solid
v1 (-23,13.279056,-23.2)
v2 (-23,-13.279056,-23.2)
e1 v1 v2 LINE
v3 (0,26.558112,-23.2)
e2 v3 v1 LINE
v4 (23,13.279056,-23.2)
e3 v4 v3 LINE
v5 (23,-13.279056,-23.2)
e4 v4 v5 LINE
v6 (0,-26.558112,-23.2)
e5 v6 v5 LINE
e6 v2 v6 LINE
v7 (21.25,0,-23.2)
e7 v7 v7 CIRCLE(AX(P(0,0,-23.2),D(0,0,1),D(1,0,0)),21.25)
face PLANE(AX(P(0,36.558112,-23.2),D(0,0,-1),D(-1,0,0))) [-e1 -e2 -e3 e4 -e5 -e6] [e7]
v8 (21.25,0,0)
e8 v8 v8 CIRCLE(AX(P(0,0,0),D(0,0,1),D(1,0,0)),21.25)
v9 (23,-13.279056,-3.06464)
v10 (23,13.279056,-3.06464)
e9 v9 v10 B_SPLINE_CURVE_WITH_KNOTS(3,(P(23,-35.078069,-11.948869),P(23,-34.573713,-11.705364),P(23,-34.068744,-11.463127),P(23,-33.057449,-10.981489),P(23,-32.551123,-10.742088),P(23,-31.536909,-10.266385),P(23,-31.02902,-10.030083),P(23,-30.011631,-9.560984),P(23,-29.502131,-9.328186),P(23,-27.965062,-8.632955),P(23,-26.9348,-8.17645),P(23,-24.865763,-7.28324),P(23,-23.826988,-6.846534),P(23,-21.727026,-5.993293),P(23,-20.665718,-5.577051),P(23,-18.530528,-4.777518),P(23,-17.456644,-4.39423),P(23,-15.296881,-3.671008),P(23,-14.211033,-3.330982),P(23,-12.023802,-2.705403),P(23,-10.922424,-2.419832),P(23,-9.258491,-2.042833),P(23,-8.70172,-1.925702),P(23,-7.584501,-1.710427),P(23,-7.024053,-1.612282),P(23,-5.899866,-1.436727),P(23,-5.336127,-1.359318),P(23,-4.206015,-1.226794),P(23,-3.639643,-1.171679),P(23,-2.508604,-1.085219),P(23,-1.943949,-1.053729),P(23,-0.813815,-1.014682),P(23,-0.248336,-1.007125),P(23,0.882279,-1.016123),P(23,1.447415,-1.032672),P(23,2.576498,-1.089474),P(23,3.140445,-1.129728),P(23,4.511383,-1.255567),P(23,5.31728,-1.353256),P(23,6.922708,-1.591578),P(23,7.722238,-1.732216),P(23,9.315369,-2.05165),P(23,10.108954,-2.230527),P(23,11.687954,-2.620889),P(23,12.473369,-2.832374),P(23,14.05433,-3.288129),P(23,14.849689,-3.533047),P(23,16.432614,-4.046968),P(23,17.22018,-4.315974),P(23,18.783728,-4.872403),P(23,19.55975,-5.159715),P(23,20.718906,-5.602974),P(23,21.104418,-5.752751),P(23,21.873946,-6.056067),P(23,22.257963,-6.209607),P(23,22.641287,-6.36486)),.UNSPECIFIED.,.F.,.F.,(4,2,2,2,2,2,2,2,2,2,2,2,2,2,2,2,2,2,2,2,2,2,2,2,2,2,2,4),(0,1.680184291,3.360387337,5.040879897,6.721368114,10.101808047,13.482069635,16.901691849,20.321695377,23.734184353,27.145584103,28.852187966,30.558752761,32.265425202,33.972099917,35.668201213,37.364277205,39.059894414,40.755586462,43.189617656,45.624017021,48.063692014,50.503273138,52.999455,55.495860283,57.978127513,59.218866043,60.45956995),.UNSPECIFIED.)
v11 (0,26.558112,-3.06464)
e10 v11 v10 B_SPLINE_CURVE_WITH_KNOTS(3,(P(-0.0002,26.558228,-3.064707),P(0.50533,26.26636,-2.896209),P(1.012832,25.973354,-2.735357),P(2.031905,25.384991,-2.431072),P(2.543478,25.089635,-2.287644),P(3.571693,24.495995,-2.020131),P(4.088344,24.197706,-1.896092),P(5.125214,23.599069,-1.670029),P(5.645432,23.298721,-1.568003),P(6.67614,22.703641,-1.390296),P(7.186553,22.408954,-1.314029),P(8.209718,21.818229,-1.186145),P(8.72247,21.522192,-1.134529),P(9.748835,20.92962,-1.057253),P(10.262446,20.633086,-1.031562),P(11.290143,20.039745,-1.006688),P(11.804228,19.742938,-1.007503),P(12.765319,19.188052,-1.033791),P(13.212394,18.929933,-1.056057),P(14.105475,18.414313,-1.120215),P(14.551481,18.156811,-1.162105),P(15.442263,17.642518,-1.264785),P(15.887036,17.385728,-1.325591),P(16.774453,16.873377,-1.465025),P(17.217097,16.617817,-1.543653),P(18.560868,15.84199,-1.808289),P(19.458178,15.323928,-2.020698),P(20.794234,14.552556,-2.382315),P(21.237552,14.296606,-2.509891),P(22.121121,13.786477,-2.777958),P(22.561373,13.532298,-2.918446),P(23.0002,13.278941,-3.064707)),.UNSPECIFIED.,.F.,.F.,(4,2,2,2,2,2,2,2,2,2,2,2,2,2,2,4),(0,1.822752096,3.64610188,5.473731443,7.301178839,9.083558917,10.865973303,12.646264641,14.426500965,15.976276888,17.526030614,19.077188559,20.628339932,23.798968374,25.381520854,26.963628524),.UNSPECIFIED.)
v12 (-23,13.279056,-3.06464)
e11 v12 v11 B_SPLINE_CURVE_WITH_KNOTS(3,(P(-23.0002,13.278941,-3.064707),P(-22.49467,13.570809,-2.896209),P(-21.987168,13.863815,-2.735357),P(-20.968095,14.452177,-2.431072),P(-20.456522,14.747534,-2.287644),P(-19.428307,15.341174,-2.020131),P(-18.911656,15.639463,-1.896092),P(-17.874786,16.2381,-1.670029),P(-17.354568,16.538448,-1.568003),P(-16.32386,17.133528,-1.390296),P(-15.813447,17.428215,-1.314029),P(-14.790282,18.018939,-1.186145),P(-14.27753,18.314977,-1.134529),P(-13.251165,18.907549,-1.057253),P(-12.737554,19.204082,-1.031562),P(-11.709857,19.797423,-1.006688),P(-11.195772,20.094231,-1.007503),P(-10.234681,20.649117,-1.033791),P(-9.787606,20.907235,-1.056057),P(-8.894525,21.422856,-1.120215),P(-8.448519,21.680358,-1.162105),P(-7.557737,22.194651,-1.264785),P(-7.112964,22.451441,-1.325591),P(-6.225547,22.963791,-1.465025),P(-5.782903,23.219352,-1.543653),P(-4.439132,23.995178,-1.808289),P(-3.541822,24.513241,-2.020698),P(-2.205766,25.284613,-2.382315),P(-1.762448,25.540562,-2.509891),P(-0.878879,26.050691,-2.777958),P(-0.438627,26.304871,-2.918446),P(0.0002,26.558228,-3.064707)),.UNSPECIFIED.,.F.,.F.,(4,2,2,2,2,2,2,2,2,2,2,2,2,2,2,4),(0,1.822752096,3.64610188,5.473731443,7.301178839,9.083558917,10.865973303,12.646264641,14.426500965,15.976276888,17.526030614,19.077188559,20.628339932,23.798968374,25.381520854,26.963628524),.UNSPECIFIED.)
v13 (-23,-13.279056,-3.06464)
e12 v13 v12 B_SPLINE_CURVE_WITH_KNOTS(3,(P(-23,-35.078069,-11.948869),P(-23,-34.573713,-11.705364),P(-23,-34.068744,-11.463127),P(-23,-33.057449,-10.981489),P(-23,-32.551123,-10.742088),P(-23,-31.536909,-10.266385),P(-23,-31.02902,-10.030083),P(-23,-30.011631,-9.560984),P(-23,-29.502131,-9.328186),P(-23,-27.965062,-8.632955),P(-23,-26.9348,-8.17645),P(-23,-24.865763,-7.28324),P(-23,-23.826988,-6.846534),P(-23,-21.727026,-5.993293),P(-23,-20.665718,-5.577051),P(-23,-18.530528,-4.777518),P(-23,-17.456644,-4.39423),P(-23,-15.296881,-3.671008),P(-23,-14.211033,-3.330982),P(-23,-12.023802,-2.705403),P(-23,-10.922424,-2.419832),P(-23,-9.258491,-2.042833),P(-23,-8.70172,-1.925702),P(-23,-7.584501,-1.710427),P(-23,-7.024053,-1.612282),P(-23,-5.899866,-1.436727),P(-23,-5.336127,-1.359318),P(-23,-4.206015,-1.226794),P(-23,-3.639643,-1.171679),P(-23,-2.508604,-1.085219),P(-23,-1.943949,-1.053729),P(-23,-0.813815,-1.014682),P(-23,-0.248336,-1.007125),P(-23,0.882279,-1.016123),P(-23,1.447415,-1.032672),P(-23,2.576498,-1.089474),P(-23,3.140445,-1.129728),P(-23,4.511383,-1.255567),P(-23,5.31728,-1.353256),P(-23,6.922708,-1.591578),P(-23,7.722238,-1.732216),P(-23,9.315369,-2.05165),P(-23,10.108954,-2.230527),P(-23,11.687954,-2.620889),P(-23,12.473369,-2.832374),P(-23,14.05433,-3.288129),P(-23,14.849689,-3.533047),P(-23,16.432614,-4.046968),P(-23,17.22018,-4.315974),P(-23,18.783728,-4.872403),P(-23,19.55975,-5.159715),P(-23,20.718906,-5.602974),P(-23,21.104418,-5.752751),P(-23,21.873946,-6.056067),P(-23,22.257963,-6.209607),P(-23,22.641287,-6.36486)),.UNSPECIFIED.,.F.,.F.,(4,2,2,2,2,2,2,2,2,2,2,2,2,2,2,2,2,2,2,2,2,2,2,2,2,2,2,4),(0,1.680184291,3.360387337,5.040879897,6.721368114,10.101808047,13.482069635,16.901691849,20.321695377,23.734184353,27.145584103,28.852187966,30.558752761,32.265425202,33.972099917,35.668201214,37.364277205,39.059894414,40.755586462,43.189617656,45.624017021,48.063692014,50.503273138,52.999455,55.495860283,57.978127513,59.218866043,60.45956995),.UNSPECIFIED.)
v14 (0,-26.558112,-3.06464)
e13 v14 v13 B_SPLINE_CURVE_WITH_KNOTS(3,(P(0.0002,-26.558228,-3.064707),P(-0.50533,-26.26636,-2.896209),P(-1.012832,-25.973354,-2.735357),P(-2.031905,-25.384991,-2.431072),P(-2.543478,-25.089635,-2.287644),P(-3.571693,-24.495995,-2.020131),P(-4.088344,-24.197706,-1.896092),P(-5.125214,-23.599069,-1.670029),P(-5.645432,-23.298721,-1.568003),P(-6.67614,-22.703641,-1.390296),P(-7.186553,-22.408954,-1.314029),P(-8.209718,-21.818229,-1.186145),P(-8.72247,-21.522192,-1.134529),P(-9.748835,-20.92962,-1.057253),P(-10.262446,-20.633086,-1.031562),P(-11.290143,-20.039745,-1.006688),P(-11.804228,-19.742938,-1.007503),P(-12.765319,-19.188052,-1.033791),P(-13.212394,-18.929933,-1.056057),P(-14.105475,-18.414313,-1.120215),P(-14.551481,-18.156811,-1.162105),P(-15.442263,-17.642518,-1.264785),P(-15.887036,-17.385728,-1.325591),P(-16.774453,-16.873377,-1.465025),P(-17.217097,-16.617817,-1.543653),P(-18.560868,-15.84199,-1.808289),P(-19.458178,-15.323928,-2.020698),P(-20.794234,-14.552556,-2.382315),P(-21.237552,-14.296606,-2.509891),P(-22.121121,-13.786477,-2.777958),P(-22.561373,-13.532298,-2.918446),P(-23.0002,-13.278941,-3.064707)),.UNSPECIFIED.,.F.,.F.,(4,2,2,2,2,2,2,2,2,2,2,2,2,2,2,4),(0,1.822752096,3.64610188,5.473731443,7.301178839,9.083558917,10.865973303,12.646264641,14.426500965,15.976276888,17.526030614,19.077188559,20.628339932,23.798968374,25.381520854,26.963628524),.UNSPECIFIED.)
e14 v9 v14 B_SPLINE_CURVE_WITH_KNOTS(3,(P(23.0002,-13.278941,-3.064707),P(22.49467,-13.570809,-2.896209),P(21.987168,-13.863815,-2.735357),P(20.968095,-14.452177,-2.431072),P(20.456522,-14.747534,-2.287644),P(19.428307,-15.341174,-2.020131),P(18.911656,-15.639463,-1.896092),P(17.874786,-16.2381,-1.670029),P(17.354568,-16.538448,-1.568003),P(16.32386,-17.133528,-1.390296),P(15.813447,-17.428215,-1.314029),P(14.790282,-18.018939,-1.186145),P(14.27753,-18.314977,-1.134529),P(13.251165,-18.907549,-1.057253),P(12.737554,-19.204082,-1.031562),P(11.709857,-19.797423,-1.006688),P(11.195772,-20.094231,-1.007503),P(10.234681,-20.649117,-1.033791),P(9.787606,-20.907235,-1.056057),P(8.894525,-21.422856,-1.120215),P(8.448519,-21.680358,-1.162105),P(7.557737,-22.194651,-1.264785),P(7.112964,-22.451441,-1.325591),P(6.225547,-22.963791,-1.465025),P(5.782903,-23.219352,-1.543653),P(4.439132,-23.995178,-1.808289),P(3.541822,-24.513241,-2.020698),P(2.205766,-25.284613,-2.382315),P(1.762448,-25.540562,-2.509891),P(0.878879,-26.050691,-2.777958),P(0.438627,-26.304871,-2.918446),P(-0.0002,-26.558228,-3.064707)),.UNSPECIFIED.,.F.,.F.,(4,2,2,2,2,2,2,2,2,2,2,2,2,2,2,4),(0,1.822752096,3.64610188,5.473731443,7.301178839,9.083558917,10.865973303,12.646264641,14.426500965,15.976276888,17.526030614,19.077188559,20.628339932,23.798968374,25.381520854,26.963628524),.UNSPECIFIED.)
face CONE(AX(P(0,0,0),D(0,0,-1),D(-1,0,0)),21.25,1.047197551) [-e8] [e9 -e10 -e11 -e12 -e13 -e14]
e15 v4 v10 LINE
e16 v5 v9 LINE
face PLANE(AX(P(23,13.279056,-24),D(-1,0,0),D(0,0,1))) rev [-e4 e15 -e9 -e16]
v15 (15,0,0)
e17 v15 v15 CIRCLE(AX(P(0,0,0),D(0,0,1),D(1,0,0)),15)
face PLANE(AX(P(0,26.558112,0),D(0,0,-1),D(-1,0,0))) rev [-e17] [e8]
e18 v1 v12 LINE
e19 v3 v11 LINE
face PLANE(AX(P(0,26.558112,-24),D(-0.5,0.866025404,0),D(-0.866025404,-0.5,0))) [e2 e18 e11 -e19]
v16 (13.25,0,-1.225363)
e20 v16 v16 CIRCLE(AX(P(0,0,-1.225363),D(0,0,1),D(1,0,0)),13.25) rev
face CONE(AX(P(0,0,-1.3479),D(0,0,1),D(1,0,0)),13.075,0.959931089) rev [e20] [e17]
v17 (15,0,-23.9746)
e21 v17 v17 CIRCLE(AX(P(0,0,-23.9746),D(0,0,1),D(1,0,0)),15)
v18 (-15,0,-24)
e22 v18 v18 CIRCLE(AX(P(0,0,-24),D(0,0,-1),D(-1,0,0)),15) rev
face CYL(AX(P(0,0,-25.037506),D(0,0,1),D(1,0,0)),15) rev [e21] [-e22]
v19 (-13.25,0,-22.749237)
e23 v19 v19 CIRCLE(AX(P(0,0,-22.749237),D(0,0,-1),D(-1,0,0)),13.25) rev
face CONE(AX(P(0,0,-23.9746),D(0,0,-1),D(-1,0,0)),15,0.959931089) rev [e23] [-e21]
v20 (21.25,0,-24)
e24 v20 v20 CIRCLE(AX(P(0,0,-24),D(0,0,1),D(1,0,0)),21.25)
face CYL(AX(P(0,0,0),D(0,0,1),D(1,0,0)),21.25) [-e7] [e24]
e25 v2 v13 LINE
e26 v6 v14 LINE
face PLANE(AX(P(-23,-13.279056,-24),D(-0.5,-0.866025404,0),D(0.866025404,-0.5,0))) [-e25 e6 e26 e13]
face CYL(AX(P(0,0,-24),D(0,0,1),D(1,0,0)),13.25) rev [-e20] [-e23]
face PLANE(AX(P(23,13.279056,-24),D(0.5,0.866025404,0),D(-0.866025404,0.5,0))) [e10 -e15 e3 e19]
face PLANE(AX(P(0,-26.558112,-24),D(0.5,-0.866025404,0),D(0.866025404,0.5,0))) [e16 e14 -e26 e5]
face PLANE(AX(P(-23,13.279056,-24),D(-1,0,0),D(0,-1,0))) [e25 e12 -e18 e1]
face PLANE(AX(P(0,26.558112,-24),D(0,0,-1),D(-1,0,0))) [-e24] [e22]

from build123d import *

# Parameters (mm, degrees)
BASENUT_START = -24
BASENUTSKE_R  = 13.25
BASENUT_DEPTH = 24
SKETCH4_W     = 0.8
SKETCH4_H     = 15.308112383


# Read off the part's stored shape, not the designer's step: ThreadSchematic
with BuildPart() as part:
    # BaseNutSke → BaseNut (new body)
    with BuildSketch(Plane.XY.offset(BASENUT_START)):
        Polygon((23, 13.279056191), (23, -13.279056191), (0, -26.558112383), (-23, -13.279056191), (-23, 13.279056191), (0, 26.558112383), align=None)
        Circle(BASENUTSKE_R, mode=Mode.SUBTRACT)
    extrude(amount=BASENUT_DEPTH)

    # Sketch5 (on Front Plane) → EndChamfer (revolve, cut)
    with BuildSketch(Plane.XY):
        Polygon((23.9746, 15), (22.626700489, 13.075), (24.0254, 13.075), (24.0254, 15), align=None)
    revolve(axis=Axis((23.9746, 15, 0), (-0.5735764363510466, -0.8191520442889915, 0)), mode=Mode.SUBTRACT)

    # Sketch4 → Bearing-Face (revolve, cut)
    with BuildSketch(Plane(origin=(0, 0, 0), x_dir=(0, 0, -1), z_dir=(1, 0, 0)), mode=Mode.PRIVATE) as bearing_face_sk:
        with Locations((23.6, 28.904056192)):
            Rectangle(SKETCH4_W, SKETCH4_H)
        Polygon((0, 21.25), (-10, 21.25), (-10, 36.558112383), (3.064640113, 36.558112383), (3.064640113, 26.558112383), align=None)
    revolve(bearing_face_sk.sketch.rotate(Axis((0, 0, 0), (0, 0, -1)), 90), axis=Axis((0, 0, 0), (0, 0, -1)), mode=Mode.SUBTRACT)

    # ThreadSchematic outline → ThreadSchematic (revolve, cut)
    with BuildSketch(Plane.XZ):
        Polygon((13.25, 0), (13.25, -1.225363192), (15, 0), align=None)
        Polygon((15, -23.9746), (13.25, -22.749236808), (13.25, -24), (15, -24), align=None)
    revolve(axis=Axis((0, 0, 0), (0, 0, 1)), mode=Mode.SUBTRACT)


solid = part.part
